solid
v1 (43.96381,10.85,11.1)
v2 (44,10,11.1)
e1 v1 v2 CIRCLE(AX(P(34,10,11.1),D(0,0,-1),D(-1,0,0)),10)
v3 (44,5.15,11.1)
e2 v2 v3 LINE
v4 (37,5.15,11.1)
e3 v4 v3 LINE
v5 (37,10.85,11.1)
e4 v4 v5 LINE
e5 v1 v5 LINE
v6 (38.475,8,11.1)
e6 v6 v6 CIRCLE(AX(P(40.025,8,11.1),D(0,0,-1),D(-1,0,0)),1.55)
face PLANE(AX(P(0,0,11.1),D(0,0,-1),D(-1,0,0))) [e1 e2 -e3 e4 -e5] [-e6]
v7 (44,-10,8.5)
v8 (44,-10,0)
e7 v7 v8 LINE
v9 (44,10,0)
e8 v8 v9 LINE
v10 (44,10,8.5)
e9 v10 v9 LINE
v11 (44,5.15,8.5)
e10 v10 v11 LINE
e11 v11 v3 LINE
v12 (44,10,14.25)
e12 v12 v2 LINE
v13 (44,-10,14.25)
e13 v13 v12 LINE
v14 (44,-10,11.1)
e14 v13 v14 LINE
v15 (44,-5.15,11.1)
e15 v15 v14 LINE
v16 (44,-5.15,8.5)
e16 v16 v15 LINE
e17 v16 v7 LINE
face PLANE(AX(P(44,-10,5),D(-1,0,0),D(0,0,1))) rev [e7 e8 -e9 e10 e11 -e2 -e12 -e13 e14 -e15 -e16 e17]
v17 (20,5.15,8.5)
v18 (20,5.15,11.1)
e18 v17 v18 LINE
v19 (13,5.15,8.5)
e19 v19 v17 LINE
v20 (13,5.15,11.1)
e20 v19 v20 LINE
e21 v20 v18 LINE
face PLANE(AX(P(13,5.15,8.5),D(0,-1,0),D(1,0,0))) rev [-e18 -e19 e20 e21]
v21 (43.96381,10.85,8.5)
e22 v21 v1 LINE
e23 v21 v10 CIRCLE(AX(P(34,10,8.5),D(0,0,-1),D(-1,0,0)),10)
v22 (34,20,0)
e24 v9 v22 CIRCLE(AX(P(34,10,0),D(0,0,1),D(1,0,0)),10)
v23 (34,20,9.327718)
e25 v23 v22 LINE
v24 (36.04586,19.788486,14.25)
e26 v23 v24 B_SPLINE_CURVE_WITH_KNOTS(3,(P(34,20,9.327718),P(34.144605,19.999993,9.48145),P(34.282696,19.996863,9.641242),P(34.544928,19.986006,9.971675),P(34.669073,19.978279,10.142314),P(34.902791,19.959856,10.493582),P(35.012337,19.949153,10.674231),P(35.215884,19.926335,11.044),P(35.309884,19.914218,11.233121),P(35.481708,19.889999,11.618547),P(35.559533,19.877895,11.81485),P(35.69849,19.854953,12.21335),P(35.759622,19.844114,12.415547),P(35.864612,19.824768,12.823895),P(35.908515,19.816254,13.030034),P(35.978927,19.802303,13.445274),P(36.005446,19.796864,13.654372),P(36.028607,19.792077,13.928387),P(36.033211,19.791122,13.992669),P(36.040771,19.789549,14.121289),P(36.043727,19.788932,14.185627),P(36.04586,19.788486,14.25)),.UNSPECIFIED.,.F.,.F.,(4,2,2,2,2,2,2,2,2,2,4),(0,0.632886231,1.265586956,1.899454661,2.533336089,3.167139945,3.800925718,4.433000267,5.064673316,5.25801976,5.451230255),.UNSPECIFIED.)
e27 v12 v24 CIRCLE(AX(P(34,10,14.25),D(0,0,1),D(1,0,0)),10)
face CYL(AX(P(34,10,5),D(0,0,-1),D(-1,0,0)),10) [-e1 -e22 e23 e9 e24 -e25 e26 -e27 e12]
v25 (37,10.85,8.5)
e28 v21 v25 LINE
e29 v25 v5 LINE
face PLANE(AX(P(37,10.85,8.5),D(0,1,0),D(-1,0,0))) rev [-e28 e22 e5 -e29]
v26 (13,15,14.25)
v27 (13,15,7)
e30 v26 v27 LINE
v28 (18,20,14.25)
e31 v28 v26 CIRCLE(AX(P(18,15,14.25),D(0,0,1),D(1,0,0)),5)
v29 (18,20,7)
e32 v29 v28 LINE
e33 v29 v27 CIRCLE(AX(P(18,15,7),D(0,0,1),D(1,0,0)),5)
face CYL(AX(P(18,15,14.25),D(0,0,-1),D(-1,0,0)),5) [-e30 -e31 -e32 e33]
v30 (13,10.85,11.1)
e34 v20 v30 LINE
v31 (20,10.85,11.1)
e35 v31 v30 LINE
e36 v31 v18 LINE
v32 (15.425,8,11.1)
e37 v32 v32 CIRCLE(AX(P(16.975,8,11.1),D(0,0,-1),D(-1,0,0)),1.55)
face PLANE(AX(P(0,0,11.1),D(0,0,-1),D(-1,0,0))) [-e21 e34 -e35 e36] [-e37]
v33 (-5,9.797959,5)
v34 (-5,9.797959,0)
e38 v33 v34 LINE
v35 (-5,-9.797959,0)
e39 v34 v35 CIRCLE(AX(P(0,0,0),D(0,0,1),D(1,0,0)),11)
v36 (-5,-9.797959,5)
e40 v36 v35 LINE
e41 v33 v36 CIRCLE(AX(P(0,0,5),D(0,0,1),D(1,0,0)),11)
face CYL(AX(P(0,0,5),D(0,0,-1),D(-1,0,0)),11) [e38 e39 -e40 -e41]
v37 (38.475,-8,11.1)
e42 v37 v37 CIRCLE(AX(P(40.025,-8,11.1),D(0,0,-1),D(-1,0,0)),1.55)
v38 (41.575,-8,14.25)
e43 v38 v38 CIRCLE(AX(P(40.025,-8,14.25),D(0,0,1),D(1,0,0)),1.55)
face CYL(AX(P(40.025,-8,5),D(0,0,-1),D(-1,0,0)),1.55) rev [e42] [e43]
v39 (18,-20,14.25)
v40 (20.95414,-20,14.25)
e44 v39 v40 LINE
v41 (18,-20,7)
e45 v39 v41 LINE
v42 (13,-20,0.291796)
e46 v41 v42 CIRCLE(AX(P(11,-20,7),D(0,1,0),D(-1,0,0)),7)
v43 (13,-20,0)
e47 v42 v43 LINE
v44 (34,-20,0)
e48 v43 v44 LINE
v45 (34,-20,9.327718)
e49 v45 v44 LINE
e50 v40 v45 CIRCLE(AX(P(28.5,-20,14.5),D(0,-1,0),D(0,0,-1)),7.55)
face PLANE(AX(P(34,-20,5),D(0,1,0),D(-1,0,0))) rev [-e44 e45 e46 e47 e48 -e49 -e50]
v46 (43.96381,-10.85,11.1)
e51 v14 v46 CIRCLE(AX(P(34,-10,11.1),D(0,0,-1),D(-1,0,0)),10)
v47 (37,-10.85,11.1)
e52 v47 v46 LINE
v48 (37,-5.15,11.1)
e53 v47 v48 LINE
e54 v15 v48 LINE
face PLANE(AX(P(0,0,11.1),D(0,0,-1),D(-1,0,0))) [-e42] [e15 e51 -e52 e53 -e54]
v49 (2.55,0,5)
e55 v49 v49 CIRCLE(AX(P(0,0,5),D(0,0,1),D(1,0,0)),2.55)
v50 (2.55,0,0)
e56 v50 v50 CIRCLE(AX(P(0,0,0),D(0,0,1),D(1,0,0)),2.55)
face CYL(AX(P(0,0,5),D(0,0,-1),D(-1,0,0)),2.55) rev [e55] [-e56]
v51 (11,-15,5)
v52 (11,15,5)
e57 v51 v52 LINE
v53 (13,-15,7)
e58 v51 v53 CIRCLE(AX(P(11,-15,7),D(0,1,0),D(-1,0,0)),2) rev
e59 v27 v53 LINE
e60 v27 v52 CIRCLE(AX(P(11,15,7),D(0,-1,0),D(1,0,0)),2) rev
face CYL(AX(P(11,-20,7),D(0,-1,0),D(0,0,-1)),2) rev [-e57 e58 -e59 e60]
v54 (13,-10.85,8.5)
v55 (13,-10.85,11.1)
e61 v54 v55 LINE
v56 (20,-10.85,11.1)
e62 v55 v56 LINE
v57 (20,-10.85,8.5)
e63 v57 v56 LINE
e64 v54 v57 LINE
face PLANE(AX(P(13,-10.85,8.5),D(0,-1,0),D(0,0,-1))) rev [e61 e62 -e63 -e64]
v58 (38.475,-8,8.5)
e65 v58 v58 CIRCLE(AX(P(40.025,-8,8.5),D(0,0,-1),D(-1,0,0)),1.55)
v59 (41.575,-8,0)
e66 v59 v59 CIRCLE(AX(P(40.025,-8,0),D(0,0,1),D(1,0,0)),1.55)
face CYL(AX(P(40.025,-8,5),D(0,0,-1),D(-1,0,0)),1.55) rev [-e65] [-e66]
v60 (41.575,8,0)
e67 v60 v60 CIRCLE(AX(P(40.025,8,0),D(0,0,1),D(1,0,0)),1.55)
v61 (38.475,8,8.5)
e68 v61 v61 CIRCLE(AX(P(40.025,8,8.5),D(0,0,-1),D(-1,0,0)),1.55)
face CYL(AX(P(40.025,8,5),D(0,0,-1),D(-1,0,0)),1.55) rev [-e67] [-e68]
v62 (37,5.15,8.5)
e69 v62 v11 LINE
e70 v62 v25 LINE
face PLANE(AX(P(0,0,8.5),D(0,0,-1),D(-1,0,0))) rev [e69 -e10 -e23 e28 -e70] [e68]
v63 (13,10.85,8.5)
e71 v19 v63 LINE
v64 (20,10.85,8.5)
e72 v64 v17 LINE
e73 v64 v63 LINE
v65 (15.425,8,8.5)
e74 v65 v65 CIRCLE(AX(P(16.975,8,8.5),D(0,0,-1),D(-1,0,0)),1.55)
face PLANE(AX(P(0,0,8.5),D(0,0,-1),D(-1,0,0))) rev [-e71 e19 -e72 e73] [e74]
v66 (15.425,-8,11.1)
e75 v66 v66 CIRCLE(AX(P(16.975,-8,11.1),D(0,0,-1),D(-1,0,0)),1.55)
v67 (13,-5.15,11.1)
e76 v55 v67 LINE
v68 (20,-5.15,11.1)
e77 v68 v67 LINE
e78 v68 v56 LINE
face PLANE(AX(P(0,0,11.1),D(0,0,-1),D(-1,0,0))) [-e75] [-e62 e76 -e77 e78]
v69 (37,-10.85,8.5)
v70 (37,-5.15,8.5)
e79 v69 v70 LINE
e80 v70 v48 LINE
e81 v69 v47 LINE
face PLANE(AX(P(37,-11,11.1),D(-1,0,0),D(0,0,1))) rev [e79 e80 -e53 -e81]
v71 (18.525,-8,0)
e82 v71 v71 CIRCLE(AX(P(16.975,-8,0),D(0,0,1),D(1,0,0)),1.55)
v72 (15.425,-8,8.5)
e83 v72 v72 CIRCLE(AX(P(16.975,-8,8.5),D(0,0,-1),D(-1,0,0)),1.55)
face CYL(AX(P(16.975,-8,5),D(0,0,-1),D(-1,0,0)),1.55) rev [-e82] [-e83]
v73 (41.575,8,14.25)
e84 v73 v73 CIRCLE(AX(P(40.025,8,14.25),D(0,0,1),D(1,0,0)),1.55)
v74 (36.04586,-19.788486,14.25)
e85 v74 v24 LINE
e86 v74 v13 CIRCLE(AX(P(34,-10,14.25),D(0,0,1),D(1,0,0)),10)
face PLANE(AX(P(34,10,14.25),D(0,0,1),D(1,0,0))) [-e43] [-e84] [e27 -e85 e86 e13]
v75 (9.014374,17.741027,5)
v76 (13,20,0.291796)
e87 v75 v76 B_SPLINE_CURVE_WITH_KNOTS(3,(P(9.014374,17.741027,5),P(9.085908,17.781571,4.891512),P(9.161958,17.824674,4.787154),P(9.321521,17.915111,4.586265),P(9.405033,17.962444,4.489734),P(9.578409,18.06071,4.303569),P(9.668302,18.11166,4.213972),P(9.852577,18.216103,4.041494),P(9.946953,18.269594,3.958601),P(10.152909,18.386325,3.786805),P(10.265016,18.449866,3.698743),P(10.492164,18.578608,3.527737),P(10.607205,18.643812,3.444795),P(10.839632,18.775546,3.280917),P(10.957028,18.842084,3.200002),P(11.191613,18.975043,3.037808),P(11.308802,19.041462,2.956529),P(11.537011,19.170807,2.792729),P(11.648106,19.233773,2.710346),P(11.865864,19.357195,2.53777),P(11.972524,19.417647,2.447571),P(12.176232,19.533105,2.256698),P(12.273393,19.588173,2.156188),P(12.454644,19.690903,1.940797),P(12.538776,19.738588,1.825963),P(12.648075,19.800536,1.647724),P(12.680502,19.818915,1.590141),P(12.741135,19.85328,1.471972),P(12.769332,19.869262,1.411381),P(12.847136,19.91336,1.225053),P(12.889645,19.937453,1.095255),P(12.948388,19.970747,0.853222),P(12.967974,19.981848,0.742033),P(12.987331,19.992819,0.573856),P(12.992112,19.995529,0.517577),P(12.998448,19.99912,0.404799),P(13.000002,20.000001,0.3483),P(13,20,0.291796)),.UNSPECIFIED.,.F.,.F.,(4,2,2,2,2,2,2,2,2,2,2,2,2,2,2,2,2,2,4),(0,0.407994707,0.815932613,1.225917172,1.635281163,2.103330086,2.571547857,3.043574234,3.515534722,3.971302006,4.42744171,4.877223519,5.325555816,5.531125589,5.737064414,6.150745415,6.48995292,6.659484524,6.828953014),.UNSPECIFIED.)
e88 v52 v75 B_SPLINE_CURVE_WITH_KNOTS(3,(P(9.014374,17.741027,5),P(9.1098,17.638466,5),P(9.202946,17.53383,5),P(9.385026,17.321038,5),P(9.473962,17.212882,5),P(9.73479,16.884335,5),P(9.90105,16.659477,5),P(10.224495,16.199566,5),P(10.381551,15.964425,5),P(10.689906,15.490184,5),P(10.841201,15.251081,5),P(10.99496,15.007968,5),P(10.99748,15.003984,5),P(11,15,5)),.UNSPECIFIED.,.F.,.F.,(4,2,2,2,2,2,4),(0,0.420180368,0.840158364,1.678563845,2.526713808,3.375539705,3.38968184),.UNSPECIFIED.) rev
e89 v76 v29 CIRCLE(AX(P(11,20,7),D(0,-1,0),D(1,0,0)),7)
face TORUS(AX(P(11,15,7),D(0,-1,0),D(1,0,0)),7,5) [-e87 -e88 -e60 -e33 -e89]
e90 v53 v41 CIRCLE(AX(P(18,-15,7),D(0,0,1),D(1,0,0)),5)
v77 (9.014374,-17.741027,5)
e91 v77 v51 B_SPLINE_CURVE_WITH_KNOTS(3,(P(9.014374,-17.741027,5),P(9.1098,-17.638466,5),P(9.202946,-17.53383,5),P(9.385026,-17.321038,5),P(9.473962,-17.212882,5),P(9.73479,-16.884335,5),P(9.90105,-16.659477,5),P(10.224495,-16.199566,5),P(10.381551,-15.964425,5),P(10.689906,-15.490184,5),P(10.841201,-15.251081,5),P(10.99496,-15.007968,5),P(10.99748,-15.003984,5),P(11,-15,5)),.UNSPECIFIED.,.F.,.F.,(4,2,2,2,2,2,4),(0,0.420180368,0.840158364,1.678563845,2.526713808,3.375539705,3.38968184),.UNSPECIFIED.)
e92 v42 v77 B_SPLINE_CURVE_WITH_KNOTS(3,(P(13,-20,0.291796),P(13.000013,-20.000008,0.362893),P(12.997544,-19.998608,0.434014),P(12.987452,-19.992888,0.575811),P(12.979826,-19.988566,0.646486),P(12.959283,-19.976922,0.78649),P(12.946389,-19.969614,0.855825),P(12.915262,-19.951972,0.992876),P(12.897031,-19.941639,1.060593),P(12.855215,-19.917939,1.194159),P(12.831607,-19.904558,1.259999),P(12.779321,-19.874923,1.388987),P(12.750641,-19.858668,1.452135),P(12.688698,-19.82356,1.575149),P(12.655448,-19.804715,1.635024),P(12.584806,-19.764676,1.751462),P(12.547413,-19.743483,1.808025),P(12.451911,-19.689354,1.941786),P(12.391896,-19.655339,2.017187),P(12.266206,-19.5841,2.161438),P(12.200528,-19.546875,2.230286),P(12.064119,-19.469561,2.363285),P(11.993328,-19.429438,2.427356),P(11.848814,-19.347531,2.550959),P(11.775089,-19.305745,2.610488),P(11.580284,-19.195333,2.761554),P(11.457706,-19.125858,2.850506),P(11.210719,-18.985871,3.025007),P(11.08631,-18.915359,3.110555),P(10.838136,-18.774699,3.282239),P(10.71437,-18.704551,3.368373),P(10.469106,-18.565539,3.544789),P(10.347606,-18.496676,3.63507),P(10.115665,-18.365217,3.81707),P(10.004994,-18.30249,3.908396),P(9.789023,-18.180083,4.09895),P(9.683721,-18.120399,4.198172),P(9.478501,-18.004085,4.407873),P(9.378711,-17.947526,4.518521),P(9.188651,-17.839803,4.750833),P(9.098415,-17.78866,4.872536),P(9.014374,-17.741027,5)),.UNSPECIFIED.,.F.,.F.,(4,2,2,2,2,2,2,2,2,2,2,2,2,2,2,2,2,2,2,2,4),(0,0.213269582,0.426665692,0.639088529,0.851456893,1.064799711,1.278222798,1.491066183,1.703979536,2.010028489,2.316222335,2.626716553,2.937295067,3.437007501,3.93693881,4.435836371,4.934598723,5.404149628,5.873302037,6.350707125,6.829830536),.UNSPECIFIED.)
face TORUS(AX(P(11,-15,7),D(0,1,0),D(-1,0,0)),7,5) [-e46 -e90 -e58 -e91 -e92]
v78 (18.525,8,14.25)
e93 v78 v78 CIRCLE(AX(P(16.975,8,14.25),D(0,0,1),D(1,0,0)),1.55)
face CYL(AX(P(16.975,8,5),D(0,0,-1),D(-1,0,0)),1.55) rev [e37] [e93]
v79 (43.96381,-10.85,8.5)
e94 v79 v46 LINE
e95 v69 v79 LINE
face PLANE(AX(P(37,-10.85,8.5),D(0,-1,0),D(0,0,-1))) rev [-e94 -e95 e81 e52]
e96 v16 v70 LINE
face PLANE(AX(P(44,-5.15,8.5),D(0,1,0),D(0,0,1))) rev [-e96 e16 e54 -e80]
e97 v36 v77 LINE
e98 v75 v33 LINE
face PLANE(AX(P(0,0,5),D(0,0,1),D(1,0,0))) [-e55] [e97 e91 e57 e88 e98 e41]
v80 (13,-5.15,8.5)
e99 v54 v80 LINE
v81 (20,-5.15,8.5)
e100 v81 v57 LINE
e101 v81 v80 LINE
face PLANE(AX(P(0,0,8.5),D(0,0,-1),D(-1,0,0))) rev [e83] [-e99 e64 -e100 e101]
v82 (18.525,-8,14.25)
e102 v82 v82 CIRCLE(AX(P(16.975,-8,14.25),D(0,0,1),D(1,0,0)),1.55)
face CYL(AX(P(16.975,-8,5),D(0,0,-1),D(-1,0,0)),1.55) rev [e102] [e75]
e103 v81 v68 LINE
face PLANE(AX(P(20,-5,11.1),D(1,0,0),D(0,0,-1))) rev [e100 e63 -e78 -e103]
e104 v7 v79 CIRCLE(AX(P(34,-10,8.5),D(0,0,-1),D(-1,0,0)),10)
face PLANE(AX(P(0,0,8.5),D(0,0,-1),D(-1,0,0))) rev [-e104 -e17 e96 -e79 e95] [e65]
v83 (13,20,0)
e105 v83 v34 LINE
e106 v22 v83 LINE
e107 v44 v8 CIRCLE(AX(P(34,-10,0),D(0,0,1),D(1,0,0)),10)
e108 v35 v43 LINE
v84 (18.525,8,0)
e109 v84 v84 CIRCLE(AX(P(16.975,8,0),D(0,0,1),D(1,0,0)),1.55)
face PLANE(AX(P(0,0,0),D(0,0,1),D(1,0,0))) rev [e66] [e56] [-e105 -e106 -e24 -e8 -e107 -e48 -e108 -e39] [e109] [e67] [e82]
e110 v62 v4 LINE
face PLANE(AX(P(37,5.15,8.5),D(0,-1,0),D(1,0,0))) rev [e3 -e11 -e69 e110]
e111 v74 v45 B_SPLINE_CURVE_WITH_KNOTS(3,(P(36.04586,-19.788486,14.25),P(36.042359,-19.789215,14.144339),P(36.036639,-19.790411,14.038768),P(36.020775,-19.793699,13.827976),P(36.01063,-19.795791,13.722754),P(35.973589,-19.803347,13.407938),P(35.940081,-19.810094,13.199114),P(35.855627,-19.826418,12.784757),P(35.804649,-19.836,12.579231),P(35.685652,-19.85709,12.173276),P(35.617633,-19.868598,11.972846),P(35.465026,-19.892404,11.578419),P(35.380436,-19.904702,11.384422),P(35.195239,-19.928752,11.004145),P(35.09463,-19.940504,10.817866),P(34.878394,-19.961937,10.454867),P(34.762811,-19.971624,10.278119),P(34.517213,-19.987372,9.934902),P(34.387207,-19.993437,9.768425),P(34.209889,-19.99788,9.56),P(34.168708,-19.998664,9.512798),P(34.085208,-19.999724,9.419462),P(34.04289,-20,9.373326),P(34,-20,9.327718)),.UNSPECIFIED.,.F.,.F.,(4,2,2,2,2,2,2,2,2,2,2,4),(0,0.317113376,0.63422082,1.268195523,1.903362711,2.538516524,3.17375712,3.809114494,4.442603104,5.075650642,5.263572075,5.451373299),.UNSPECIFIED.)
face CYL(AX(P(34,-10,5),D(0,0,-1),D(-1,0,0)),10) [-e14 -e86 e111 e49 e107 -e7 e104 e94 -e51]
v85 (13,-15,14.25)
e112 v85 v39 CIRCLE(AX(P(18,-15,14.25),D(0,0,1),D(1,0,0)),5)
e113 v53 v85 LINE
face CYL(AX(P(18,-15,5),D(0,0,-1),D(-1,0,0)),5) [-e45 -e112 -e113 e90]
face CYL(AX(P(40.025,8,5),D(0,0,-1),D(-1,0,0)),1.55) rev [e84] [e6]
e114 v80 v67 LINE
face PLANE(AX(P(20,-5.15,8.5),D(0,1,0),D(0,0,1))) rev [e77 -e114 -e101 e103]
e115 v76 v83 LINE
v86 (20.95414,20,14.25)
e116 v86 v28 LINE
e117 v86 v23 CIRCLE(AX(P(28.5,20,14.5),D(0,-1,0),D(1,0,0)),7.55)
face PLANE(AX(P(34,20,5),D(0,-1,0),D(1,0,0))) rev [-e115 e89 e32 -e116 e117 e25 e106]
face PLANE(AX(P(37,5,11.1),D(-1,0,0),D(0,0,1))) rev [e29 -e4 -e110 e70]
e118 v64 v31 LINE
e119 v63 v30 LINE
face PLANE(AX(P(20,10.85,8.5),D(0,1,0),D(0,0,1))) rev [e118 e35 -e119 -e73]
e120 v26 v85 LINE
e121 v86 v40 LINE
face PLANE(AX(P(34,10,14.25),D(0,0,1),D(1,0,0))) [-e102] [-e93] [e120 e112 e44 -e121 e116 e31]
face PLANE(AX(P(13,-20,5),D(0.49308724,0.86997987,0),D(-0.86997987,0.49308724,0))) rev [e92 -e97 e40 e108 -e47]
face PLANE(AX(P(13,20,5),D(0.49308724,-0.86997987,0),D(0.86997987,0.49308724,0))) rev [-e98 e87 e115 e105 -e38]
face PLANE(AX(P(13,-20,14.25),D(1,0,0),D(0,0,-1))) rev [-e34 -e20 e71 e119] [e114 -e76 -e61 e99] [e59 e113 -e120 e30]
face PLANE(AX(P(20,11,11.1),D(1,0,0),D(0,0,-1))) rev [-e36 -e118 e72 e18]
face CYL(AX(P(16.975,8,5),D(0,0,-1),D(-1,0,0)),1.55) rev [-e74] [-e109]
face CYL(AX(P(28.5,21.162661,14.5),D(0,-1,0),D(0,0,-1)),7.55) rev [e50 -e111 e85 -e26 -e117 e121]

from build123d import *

# Parameters (mm, degrees)
SKETCH_3_R          = 2.55
SKETCH_3_R_2        = 1.55
EXTRUDE_1_DEPTH     = 5
SKETCH_4_R          = 1.55
EXTRUDE_2_DEPTH     = 9.25
FILLET_2_R          = 2
FILLET_START        = 6.9999999
FILLET_3_2_DEPTH    = 8.0000001
SKETCH_5_W          = 7
SKETCH_5_H          = 6
CUT_EXTRUDE_1_DEPTH = 2.6
SKETCH_6_R          = 7.55
CUT_EXTRUDE_2_DEPTH = 62.147874109
EXTRUDE_START       = 2.6
SKETCH_7_W          = 7
SKETCH_7_H          = 0.15
EXTRUDE_3_DEPTH     = 2.6


with BuildPart() as part:
    # 草图3 → 凸台-拉伸1 (new body)
    with BuildSketch(Plane.XY):
        with BuildLine():
            Line((13, 20), (-5, 9.797958971))
            ThreePointArc((-5, 9.797958971), (-11, 0), (-5, -9.797958971))
            Line((-5, -9.797958971), (13, -20))
            Line((13, -20), (34, -20))
            ThreePointArc((34, -20), (41.071067812, -17.071067812), (44, -10))
            Line((44, -10), (44, 10))
            ThreePointArc((44, 10), (41.071067812, 17.071067812), (34, 20))
            Line((34, 20), (13, 20))
        make_face()
        Circle(SKETCH_3_R, mode=Mode.SUBTRACT)
        with Locations((16.975, -8)):
            Circle(SKETCH_3_R_2, mode=Mode.SUBTRACT)
        with Locations((16.975, 8)):
            Circle(SKETCH_3_R_2, mode=Mode.SUBTRACT)
        with Locations((40.025, 8)):
            Circle(SKETCH_3_R_2, mode=Mode.SUBTRACT)
        with Locations((40.025, -8)):
            Circle(SKETCH_3_R_2, mode=Mode.SUBTRACT)
    extrude(amount=EXTRUDE_1_DEPTH)

    # 草图4 → 凸台-拉伸2 (add)
    with BuildSketch(Plane.XY.offset(5)):
        with BuildLine():
            Line((13, -15), (13, 15))
            Line((13, 15), (13, 20))
            Line((13, 20), (18, 20))
            Line((18, 20), (34, 20))
            ThreePointArc((34, 20), (41.071067812, 17.071067812), (44, 10))
            Line((44, 10), (44, -10))
            ThreePointArc((44, -10), (41.071067812, -17.071067812), (34, -20))
            Line((34, -20), (18, -20))
            Line((18, -20), (13, -20))
            Line((13, -20), (13, -15))
        make_face()
        with Locations((16.975, 8)):
            Circle(SKETCH_4_R, mode=Mode.SUBTRACT)
        with Locations((16.975, -8)):
            Circle(SKETCH_4_R, mode=Mode.SUBTRACT)
        with Locations((40.025, -8)):
            Circle(SKETCH_4_R, mode=Mode.SUBTRACT)
        with Locations((40.025, 8)):
            Circle(SKETCH_4_R, mode=Mode.SUBTRACT)
    extrude(amount=EXTRUDE_2_DEPTH)

    # 圆角2
    fillet_2_edges = [part.edges().sort_by_distance(p)[0] for p in [
        (13, 0, 5),
    ]]
    fillet(fillet_2_edges, radius=FILLET_2_R)

    # 圆角3: read off the stored shape, not the designer's step
    # 圆角3 outline → 圆角3 (revolve, cut)
    with BuildSketch(Plane(origin=(11, 0, 7), x_dir=(1, 0, 0), z_dir=(0, 0, 1))):
        with BuildLine():
            ThreePointArc((7, -20), (3.464466094, -18.535533906), (2, -15))
            Line((2, -15), (2, -20))
            Line((2, -20), (7, -20))
        make_face()
        with BuildLine():
            Line((2, 20), (2, 15))
            ThreePointArc((2, 15), (3.464466094, 18.535533906), (7, 20))
            Line((7, 20), (2, 20))
        make_face()
    revolve(axis=Axis((11, 0, 7), (0, 1, 0)), mode=Mode.SUBTRACT)

    # Fillet 3 2 outline → Fillet 3 2 (cut)
    with BuildSketch(Plane.XY.offset(FILLET_START)):
        with BuildLine():
            Line((13, -20), (18, -20))
            ThreePointArc((18, -20), (14.464466094, -18.535533906), (13, -15))
            Line((13, -15), (13, -20))
        make_face()
        with BuildLine():
            Line((13, 20), (13, 15))
            ThreePointArc((13, 15), (14.464466094, 18.535533906), (18, 20))
            Line((18, 20), (13, 20))
        make_face()
    extrude(amount=FILLET_3_2_DEPTH, mode=Mode.SUBTRACT)

    # 草图5 → 切除-拉伸1 (cut)
    with BuildSketch(Plane(origin=(0, 0, 8.5), x_dir=(-1, 0, 0), z_dir=(0, 0, -1))):
        with Locations((-40.5, 8)):
            Rectangle(SKETCH_5_W, SKETCH_5_H)
        with Locations((-40.5, -8)):
            Rectangle(SKETCH_5_W, SKETCH_5_H)
        with Locations((-16.5, -8)):
            Rectangle(SKETCH_5_W, SKETCH_5_H)
        with Locations((-16.5, 8)):
            Rectangle(SKETCH_5_W, SKETCH_5_H)
    extrude(amount=-CUT_EXTRUDE_1_DEPTH, mode=Mode.SUBTRACT)

    # 草图6 → 切除-拉伸2 (cut, through all)
    with BuildSketch(Plane.XZ.offset(20)):
        with Locations((28.5, 14.5)):
            Circle(SKETCH_6_R)
    extrude(amount=-CUT_EXTRUDE_2_DEPTH, mode=Mode.SUBTRACT)

    # 草图7 → 凸台-拉伸3 (add)
    with BuildSketch(Plane(origin=(0, 0, 11.1), x_dir=(-1, 0, 0), z_dir=(0, 0, -1)).offset(EXTRUDE_START)):
        with BuildLine():
            Line((-37, 11), (-43.949874371, 11))
            ThreePointArc((-43.949874371, 11), (-43.957124407, 10.925026241), (-43.963809512, 10.85))
            Line((-43.963809512, 10.85), (-37, 10.85))
            Line((-37, 10.85), (-37, 11))
        make_face()
        with Locations((-40.5, 5.075)):
            Rectangle(SKETCH_7_W, SKETCH_7_H)
        with Locations((-40.5, -5.075)):
            Rectangle(SKETCH_7_W, SKETCH_7_H)
        with BuildLine():
            Line((-37, -11), (-37, -10.85))
            Line((-37, -10.85), (-43.963809512, -10.85))
            ThreePointArc((-43.963809512, -10.85), (-43.957124407, -10.925026241), (-43.949874371, -11))
            Line((-43.949874371, -11), (-37, -11))
        make_face()
        with Locations((-16.5, -10.925)):
            Rectangle(SKETCH_7_W, SKETCH_7_H)
        with Locations((-16.5, -5.075)):
            Rectangle(SKETCH_7_W, SKETCH_7_H)
        with Locations((-16.5, 5.075)):
            Rectangle(SKETCH_7_W, SKETCH_7_H)
        with Locations((-16.5, 10.925)):
            Rectangle(SKETCH_7_W, SKETCH_7_H)
    extrude(amount=-EXTRUDE_3_DEPTH)


solid = part.part
